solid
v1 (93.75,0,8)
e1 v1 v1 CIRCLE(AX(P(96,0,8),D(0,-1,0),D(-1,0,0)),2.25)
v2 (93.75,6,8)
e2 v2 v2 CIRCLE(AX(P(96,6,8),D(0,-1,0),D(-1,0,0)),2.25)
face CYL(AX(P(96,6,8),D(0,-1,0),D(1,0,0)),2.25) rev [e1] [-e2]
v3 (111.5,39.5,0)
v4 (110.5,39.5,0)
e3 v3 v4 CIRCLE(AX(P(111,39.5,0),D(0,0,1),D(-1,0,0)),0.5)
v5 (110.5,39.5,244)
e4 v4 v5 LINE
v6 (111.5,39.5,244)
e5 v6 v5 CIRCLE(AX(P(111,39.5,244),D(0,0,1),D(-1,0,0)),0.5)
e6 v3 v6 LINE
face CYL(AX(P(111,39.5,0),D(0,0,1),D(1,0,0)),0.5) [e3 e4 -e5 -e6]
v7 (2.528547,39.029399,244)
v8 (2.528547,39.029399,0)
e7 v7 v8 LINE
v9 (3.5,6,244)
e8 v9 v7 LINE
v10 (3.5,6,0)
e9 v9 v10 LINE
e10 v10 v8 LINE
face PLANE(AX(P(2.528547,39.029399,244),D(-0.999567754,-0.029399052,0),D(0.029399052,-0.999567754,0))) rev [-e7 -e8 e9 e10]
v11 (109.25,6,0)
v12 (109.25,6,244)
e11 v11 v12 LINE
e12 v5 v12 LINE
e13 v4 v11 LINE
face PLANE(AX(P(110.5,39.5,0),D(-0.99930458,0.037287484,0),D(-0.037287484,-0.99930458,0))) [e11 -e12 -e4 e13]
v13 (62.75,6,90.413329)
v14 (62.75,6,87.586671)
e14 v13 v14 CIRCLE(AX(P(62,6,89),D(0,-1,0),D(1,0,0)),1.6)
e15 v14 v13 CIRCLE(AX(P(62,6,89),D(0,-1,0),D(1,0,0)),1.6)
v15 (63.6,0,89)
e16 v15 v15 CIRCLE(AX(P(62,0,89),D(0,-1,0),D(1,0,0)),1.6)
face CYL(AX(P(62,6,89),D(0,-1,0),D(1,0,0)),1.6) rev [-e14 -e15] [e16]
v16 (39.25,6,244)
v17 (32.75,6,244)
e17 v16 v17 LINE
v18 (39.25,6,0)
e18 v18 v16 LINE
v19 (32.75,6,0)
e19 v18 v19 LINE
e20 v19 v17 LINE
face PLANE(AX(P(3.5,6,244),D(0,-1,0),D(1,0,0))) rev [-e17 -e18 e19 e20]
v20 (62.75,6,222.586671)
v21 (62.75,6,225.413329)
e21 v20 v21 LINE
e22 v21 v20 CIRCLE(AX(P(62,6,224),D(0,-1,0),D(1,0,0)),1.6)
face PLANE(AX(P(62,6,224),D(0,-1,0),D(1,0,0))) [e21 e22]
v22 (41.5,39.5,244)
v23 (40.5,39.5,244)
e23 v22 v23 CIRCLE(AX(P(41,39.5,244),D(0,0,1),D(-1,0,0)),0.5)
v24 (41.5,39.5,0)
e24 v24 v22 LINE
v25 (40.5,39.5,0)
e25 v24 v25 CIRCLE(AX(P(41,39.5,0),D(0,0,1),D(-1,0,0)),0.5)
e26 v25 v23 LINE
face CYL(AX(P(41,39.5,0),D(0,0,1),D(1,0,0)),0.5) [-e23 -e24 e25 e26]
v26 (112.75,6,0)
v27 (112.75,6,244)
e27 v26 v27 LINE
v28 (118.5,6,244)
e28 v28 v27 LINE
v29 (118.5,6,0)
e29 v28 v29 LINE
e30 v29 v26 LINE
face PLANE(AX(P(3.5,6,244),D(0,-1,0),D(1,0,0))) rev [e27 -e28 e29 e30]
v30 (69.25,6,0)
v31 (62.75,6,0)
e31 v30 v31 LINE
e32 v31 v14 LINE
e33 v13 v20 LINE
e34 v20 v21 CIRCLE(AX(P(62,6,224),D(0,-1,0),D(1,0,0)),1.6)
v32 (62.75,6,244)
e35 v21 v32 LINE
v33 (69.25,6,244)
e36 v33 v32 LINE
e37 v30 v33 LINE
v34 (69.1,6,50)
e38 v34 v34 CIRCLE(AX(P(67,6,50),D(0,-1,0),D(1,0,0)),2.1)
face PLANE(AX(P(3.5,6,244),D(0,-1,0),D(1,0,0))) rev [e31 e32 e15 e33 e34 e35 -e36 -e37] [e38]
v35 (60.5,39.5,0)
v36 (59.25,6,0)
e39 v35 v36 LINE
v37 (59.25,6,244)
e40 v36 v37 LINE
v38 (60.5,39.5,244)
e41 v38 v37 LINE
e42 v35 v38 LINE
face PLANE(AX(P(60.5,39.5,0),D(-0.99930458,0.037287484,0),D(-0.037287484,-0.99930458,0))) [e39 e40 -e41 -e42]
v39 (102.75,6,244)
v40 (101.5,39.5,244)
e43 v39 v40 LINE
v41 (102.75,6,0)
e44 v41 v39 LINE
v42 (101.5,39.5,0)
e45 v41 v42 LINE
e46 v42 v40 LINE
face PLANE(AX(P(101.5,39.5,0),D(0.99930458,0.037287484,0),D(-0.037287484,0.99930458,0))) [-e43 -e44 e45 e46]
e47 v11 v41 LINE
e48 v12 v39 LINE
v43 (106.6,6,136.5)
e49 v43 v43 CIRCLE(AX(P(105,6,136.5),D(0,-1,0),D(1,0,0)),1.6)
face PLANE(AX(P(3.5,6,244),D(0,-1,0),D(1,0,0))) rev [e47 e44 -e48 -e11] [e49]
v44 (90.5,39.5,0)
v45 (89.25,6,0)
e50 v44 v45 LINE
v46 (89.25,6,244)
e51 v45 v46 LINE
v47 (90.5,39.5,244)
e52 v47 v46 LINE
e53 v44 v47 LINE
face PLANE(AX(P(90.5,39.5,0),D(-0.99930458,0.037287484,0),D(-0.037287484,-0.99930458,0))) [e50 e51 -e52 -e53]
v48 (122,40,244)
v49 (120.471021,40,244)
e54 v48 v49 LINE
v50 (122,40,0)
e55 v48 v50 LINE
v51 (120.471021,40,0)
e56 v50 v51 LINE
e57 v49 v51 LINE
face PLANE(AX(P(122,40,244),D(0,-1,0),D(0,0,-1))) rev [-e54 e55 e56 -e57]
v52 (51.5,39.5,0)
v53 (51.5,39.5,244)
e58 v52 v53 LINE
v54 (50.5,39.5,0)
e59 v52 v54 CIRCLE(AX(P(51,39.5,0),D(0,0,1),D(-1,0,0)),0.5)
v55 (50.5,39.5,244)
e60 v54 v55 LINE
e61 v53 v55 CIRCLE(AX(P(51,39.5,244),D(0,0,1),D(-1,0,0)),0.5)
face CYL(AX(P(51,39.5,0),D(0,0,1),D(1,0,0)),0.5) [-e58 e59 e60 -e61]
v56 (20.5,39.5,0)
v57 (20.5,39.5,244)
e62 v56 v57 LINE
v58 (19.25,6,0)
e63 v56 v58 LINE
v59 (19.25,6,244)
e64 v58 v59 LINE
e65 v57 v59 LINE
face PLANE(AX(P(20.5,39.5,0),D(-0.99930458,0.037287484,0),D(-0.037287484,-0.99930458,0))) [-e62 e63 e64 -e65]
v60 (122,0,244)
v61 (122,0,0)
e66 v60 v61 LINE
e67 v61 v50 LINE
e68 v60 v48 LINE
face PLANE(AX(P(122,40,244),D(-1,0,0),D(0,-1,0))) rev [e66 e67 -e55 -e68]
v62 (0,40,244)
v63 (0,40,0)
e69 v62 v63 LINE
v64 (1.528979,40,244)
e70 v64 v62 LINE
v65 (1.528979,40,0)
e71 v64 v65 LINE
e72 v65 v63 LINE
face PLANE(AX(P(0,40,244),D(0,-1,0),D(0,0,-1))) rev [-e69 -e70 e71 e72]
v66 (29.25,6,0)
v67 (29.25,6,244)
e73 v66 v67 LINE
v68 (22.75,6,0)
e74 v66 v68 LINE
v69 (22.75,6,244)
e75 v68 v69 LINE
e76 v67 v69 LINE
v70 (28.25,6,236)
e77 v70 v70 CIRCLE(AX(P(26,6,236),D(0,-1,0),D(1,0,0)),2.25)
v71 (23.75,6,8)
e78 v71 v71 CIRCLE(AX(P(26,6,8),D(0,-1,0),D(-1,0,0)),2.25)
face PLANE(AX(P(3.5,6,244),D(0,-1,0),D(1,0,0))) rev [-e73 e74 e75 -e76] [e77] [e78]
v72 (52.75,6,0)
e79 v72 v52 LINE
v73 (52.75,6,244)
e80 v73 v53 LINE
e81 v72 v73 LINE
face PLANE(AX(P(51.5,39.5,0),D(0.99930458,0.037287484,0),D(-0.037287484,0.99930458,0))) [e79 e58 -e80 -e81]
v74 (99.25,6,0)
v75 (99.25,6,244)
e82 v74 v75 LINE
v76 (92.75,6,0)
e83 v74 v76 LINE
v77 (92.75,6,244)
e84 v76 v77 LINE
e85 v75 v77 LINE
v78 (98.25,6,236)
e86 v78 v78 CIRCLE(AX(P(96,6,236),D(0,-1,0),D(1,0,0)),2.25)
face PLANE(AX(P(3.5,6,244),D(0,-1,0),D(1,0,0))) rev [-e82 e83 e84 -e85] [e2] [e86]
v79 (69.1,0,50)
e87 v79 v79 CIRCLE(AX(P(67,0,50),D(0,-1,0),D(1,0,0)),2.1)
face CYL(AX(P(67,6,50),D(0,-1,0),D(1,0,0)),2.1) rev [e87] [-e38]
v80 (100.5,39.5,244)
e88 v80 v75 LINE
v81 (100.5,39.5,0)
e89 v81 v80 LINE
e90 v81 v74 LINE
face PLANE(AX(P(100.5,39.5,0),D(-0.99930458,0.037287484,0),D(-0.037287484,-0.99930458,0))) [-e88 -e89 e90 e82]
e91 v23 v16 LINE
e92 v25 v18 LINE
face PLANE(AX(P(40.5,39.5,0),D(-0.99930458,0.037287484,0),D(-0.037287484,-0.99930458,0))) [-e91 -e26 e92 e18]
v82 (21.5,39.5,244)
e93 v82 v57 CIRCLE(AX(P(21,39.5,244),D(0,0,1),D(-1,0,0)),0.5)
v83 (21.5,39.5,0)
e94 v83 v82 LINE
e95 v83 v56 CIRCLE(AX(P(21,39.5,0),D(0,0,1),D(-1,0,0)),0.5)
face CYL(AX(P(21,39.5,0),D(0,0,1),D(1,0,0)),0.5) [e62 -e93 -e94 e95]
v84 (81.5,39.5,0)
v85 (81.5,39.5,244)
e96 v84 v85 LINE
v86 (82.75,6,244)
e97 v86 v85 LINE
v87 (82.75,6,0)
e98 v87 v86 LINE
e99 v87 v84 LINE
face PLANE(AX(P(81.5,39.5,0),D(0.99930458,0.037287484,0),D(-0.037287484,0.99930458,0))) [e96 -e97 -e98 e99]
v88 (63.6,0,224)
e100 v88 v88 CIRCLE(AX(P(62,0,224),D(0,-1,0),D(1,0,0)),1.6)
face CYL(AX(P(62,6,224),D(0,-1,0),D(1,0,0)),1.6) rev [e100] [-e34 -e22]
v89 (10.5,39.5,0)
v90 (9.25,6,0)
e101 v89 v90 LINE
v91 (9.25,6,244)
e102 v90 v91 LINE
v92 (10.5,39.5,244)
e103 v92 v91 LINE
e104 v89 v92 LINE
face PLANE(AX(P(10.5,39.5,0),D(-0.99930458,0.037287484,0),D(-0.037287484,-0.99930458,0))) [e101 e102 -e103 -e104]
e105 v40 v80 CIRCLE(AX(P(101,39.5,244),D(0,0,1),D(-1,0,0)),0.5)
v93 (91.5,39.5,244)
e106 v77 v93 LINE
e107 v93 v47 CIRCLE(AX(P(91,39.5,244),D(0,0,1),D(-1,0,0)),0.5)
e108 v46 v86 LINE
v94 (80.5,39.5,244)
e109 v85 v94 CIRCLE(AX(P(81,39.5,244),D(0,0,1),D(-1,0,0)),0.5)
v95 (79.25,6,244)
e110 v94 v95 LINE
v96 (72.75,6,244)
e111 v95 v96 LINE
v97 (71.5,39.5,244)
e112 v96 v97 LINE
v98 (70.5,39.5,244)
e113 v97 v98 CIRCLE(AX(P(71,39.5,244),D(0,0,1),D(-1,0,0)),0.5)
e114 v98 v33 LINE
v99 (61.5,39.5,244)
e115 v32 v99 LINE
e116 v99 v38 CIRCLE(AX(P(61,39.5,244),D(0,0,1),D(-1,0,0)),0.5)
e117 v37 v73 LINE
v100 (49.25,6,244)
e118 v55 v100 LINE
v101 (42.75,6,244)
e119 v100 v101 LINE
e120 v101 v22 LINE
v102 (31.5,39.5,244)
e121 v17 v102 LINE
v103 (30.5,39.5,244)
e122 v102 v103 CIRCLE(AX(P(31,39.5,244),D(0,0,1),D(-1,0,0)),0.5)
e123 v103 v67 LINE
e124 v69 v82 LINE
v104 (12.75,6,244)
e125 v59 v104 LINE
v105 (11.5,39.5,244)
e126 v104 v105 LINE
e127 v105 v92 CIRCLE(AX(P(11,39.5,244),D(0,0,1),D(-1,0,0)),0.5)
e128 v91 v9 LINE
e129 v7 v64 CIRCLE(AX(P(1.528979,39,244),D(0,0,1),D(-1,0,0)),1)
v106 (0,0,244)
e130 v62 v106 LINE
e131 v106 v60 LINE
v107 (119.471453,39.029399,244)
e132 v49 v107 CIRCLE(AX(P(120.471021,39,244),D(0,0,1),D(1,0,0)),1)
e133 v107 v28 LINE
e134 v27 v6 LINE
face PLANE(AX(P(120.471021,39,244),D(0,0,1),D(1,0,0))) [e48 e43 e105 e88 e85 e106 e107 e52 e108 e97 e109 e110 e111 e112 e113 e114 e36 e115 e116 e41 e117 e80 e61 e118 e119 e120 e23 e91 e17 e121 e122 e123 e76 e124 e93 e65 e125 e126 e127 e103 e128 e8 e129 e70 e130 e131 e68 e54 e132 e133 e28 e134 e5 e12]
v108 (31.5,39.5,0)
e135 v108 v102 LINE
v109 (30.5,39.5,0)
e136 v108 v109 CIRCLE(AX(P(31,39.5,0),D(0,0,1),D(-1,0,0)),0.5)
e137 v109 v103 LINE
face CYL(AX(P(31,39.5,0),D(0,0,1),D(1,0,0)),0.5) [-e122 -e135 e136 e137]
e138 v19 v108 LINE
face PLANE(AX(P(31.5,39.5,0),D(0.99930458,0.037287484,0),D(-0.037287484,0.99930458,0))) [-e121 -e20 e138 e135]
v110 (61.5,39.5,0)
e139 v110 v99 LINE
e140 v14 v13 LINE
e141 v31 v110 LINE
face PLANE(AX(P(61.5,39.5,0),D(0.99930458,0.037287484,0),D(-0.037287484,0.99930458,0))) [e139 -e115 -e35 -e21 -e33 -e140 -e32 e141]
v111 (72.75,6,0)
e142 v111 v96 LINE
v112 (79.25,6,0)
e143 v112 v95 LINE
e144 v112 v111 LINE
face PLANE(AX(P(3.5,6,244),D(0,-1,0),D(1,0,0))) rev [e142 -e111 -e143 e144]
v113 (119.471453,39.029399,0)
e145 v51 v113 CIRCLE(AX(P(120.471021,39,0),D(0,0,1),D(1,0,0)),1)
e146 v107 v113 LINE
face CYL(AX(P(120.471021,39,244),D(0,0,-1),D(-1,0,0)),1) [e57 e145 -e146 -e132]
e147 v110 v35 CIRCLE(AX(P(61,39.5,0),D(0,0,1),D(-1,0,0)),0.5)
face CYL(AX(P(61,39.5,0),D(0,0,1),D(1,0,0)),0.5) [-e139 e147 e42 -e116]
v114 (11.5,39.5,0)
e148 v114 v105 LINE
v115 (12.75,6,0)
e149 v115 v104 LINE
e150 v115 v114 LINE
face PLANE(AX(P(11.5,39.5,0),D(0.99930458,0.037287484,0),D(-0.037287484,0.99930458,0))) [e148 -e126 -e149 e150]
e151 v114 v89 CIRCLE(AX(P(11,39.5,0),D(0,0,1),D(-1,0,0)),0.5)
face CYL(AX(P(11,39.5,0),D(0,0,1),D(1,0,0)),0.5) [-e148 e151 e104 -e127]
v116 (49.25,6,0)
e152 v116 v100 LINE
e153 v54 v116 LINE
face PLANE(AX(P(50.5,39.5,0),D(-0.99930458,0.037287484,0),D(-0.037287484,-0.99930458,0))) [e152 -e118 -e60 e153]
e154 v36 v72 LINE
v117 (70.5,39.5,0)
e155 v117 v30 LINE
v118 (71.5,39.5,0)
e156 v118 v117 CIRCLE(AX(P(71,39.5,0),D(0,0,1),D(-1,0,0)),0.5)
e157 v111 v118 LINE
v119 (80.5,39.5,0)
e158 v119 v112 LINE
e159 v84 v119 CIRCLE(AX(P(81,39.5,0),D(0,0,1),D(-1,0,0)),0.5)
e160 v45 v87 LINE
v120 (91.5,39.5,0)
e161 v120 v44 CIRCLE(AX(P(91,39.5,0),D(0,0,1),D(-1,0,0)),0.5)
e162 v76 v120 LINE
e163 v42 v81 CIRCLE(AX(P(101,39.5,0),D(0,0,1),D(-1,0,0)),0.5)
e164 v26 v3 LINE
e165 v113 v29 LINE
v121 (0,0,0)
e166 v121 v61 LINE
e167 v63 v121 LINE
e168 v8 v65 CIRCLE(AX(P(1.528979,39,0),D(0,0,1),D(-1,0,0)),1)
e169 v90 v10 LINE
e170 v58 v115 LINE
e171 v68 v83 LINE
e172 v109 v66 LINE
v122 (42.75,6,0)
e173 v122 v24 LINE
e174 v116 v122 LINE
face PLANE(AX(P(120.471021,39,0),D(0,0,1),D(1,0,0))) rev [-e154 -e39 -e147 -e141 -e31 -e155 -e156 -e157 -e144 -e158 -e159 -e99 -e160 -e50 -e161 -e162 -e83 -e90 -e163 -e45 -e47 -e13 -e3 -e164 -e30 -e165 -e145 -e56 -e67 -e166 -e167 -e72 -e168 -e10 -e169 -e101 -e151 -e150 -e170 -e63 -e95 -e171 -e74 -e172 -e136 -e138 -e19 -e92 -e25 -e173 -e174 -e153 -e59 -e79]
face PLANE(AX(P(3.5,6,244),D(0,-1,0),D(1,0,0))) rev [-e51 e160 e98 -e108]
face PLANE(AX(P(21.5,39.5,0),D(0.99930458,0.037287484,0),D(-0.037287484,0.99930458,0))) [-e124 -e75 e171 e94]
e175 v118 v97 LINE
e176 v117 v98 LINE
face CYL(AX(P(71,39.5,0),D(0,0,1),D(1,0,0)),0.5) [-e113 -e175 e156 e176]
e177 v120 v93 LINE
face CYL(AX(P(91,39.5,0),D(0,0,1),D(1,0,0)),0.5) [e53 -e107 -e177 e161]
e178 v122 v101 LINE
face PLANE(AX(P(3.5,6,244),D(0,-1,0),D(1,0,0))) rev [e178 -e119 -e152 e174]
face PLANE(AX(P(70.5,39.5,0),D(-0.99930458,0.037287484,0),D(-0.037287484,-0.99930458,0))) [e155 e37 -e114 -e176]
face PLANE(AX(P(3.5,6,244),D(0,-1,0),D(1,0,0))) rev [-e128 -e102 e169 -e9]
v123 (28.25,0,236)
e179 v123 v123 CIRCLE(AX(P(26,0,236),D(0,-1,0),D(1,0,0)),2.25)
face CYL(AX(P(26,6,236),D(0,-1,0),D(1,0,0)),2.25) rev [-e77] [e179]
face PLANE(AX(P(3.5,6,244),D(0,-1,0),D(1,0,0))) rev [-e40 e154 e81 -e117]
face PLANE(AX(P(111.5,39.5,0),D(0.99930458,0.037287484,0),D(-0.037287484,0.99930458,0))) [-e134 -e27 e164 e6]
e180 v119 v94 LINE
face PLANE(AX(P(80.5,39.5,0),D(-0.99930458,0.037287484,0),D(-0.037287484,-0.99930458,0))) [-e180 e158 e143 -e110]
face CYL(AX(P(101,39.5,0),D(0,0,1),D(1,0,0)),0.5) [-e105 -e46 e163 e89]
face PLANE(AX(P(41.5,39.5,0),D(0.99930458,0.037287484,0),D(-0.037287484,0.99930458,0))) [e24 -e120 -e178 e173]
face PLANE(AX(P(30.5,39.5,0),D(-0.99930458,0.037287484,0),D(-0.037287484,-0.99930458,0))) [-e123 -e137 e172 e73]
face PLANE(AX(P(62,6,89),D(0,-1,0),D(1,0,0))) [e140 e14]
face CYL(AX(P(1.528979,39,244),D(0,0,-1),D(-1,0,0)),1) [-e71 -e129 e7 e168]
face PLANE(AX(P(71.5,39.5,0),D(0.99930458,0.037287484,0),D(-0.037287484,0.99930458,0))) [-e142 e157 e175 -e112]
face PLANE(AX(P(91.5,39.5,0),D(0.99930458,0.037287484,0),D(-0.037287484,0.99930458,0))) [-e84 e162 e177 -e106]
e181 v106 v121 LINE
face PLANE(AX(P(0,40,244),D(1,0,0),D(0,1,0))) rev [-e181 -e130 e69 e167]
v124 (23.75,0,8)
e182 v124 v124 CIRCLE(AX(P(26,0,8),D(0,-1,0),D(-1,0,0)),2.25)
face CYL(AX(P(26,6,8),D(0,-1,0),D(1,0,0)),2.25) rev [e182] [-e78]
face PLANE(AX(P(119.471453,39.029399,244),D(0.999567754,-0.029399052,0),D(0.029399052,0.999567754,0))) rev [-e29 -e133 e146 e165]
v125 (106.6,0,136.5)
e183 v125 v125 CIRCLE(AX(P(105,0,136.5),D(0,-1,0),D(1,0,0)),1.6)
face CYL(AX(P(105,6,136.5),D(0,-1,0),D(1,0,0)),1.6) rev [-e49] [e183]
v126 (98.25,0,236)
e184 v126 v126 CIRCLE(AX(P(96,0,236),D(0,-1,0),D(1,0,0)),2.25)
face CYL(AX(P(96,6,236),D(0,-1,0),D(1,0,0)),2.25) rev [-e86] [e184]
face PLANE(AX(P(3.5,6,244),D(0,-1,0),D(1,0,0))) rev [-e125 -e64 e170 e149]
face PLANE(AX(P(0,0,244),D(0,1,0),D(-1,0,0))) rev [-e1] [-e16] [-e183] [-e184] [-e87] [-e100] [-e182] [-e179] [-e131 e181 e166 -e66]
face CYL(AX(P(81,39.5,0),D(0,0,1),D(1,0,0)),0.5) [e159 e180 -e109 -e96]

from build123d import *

# Parameters (mm, degrees)
EXTRUDE_1_DEPTH       = 244
EXTRUDE_3_DEPTH       = 244
PATTERN_CURVE_1_COUNT = 11
PATTERN_CURVE_1_PITCH = 10
SKETCH_3_R            = 2.25
CUT_EXTRUDE_1_DEPTH   = 6
SKETCH_4_R            = 2.1
SKETCH_4_R_2          = 1.6
CUT_EXTRUDE_2_DEPTH   = 6


with BuildPart() as part:
    # Эскиз1 → Вытянуть1 (new body)
    with BuildSketch(Plane.XY):
        with BuildLine():
            Line((0, 40), (1.528979332, 40))
            ThreePointArc((1.528979332, 40), (2.225614441, 39.717425624), (2.528547087, 39.029399052))
            Line((2.528547087, 39.029399052), (3.5, 6))
            Line((3.5, 6), (118.5, 6))
            Line((118.5, 6), (119.471452913, 39.029399052))
            ThreePointArc((119.471452913, 39.029399052), (119.774385559, 39.717425624), (120.471020668, 40))
            Line((120.471020668, 40), (122, 40))
            Line((122, 40), (122, 0))
            Line((122, 0), (0, 0))
            Line((0, 0), (0, 40))
        make_face()
    extrude(amount=EXTRUDE_1_DEPTH)

    # Эскиз2 → Вытянуть3 (add)
    with BuildSketch(Plane.XY.offset(244)):
        with BuildLine():
            Line((10.5, 39.5), (9.25, 6))
            Line((9.25, 6), (12.75, 6))
            Line((12.75, 6), (11.5, 39.5))
            ThreePointArc((11.5, 39.5), (11, 40), (10.5, 39.5))
        make_face()
    extrude_3 = extrude(amount=-EXTRUDE_3_DEPTH)

    # Кривая1: Вытянуть3 ×11
    with Locations(*[(i * PATTERN_CURVE_1_PITCH, 0, 0) for i in range(1, PATTERN_CURVE_1_COUNT)]):
        add(extrude_3)

    # Эскиз3 → Вырез-Вытянуть1 (cut)
    with BuildSketch(Plane.XZ):
        with Locations((26, 236)):
            Circle(SKETCH_3_R)
        with Locations((96, 236)):
            Circle(SKETCH_3_R)
        with Locations((96, 8)):
            Circle(SKETCH_3_R)
        with Locations((26, 8)):
            Circle(SKETCH_3_R)
    extrude(amount=-CUT_EXTRUDE_1_DEPTH, mode=Mode.SUBTRACT)

    # Эскиз4 → Вырез-Вытянуть2 (cut)
    with BuildSketch(Plane(origin=(1.487985642, 0, 27.400529356), x_dir=(1, 0, 0), z_dir=(0, -1, 0))):
        with Locations((65.512014358, 22.599470644)):
            Circle(SKETCH_4_R)
        with Locations((103.512014358, 109.099470644)):
            Circle(SKETCH_4_R_2)
        with Locations((60.512014358, 196.599470644)):
            Circle(SKETCH_4_R_2)
        with Locations((60.512014358, 61.599470644)):
            Circle(SKETCH_4_R_2)
    extrude(amount=-CUT_EXTRUDE_2_DEPTH, mode=Mode.SUBTRACT)


solid = part.part
